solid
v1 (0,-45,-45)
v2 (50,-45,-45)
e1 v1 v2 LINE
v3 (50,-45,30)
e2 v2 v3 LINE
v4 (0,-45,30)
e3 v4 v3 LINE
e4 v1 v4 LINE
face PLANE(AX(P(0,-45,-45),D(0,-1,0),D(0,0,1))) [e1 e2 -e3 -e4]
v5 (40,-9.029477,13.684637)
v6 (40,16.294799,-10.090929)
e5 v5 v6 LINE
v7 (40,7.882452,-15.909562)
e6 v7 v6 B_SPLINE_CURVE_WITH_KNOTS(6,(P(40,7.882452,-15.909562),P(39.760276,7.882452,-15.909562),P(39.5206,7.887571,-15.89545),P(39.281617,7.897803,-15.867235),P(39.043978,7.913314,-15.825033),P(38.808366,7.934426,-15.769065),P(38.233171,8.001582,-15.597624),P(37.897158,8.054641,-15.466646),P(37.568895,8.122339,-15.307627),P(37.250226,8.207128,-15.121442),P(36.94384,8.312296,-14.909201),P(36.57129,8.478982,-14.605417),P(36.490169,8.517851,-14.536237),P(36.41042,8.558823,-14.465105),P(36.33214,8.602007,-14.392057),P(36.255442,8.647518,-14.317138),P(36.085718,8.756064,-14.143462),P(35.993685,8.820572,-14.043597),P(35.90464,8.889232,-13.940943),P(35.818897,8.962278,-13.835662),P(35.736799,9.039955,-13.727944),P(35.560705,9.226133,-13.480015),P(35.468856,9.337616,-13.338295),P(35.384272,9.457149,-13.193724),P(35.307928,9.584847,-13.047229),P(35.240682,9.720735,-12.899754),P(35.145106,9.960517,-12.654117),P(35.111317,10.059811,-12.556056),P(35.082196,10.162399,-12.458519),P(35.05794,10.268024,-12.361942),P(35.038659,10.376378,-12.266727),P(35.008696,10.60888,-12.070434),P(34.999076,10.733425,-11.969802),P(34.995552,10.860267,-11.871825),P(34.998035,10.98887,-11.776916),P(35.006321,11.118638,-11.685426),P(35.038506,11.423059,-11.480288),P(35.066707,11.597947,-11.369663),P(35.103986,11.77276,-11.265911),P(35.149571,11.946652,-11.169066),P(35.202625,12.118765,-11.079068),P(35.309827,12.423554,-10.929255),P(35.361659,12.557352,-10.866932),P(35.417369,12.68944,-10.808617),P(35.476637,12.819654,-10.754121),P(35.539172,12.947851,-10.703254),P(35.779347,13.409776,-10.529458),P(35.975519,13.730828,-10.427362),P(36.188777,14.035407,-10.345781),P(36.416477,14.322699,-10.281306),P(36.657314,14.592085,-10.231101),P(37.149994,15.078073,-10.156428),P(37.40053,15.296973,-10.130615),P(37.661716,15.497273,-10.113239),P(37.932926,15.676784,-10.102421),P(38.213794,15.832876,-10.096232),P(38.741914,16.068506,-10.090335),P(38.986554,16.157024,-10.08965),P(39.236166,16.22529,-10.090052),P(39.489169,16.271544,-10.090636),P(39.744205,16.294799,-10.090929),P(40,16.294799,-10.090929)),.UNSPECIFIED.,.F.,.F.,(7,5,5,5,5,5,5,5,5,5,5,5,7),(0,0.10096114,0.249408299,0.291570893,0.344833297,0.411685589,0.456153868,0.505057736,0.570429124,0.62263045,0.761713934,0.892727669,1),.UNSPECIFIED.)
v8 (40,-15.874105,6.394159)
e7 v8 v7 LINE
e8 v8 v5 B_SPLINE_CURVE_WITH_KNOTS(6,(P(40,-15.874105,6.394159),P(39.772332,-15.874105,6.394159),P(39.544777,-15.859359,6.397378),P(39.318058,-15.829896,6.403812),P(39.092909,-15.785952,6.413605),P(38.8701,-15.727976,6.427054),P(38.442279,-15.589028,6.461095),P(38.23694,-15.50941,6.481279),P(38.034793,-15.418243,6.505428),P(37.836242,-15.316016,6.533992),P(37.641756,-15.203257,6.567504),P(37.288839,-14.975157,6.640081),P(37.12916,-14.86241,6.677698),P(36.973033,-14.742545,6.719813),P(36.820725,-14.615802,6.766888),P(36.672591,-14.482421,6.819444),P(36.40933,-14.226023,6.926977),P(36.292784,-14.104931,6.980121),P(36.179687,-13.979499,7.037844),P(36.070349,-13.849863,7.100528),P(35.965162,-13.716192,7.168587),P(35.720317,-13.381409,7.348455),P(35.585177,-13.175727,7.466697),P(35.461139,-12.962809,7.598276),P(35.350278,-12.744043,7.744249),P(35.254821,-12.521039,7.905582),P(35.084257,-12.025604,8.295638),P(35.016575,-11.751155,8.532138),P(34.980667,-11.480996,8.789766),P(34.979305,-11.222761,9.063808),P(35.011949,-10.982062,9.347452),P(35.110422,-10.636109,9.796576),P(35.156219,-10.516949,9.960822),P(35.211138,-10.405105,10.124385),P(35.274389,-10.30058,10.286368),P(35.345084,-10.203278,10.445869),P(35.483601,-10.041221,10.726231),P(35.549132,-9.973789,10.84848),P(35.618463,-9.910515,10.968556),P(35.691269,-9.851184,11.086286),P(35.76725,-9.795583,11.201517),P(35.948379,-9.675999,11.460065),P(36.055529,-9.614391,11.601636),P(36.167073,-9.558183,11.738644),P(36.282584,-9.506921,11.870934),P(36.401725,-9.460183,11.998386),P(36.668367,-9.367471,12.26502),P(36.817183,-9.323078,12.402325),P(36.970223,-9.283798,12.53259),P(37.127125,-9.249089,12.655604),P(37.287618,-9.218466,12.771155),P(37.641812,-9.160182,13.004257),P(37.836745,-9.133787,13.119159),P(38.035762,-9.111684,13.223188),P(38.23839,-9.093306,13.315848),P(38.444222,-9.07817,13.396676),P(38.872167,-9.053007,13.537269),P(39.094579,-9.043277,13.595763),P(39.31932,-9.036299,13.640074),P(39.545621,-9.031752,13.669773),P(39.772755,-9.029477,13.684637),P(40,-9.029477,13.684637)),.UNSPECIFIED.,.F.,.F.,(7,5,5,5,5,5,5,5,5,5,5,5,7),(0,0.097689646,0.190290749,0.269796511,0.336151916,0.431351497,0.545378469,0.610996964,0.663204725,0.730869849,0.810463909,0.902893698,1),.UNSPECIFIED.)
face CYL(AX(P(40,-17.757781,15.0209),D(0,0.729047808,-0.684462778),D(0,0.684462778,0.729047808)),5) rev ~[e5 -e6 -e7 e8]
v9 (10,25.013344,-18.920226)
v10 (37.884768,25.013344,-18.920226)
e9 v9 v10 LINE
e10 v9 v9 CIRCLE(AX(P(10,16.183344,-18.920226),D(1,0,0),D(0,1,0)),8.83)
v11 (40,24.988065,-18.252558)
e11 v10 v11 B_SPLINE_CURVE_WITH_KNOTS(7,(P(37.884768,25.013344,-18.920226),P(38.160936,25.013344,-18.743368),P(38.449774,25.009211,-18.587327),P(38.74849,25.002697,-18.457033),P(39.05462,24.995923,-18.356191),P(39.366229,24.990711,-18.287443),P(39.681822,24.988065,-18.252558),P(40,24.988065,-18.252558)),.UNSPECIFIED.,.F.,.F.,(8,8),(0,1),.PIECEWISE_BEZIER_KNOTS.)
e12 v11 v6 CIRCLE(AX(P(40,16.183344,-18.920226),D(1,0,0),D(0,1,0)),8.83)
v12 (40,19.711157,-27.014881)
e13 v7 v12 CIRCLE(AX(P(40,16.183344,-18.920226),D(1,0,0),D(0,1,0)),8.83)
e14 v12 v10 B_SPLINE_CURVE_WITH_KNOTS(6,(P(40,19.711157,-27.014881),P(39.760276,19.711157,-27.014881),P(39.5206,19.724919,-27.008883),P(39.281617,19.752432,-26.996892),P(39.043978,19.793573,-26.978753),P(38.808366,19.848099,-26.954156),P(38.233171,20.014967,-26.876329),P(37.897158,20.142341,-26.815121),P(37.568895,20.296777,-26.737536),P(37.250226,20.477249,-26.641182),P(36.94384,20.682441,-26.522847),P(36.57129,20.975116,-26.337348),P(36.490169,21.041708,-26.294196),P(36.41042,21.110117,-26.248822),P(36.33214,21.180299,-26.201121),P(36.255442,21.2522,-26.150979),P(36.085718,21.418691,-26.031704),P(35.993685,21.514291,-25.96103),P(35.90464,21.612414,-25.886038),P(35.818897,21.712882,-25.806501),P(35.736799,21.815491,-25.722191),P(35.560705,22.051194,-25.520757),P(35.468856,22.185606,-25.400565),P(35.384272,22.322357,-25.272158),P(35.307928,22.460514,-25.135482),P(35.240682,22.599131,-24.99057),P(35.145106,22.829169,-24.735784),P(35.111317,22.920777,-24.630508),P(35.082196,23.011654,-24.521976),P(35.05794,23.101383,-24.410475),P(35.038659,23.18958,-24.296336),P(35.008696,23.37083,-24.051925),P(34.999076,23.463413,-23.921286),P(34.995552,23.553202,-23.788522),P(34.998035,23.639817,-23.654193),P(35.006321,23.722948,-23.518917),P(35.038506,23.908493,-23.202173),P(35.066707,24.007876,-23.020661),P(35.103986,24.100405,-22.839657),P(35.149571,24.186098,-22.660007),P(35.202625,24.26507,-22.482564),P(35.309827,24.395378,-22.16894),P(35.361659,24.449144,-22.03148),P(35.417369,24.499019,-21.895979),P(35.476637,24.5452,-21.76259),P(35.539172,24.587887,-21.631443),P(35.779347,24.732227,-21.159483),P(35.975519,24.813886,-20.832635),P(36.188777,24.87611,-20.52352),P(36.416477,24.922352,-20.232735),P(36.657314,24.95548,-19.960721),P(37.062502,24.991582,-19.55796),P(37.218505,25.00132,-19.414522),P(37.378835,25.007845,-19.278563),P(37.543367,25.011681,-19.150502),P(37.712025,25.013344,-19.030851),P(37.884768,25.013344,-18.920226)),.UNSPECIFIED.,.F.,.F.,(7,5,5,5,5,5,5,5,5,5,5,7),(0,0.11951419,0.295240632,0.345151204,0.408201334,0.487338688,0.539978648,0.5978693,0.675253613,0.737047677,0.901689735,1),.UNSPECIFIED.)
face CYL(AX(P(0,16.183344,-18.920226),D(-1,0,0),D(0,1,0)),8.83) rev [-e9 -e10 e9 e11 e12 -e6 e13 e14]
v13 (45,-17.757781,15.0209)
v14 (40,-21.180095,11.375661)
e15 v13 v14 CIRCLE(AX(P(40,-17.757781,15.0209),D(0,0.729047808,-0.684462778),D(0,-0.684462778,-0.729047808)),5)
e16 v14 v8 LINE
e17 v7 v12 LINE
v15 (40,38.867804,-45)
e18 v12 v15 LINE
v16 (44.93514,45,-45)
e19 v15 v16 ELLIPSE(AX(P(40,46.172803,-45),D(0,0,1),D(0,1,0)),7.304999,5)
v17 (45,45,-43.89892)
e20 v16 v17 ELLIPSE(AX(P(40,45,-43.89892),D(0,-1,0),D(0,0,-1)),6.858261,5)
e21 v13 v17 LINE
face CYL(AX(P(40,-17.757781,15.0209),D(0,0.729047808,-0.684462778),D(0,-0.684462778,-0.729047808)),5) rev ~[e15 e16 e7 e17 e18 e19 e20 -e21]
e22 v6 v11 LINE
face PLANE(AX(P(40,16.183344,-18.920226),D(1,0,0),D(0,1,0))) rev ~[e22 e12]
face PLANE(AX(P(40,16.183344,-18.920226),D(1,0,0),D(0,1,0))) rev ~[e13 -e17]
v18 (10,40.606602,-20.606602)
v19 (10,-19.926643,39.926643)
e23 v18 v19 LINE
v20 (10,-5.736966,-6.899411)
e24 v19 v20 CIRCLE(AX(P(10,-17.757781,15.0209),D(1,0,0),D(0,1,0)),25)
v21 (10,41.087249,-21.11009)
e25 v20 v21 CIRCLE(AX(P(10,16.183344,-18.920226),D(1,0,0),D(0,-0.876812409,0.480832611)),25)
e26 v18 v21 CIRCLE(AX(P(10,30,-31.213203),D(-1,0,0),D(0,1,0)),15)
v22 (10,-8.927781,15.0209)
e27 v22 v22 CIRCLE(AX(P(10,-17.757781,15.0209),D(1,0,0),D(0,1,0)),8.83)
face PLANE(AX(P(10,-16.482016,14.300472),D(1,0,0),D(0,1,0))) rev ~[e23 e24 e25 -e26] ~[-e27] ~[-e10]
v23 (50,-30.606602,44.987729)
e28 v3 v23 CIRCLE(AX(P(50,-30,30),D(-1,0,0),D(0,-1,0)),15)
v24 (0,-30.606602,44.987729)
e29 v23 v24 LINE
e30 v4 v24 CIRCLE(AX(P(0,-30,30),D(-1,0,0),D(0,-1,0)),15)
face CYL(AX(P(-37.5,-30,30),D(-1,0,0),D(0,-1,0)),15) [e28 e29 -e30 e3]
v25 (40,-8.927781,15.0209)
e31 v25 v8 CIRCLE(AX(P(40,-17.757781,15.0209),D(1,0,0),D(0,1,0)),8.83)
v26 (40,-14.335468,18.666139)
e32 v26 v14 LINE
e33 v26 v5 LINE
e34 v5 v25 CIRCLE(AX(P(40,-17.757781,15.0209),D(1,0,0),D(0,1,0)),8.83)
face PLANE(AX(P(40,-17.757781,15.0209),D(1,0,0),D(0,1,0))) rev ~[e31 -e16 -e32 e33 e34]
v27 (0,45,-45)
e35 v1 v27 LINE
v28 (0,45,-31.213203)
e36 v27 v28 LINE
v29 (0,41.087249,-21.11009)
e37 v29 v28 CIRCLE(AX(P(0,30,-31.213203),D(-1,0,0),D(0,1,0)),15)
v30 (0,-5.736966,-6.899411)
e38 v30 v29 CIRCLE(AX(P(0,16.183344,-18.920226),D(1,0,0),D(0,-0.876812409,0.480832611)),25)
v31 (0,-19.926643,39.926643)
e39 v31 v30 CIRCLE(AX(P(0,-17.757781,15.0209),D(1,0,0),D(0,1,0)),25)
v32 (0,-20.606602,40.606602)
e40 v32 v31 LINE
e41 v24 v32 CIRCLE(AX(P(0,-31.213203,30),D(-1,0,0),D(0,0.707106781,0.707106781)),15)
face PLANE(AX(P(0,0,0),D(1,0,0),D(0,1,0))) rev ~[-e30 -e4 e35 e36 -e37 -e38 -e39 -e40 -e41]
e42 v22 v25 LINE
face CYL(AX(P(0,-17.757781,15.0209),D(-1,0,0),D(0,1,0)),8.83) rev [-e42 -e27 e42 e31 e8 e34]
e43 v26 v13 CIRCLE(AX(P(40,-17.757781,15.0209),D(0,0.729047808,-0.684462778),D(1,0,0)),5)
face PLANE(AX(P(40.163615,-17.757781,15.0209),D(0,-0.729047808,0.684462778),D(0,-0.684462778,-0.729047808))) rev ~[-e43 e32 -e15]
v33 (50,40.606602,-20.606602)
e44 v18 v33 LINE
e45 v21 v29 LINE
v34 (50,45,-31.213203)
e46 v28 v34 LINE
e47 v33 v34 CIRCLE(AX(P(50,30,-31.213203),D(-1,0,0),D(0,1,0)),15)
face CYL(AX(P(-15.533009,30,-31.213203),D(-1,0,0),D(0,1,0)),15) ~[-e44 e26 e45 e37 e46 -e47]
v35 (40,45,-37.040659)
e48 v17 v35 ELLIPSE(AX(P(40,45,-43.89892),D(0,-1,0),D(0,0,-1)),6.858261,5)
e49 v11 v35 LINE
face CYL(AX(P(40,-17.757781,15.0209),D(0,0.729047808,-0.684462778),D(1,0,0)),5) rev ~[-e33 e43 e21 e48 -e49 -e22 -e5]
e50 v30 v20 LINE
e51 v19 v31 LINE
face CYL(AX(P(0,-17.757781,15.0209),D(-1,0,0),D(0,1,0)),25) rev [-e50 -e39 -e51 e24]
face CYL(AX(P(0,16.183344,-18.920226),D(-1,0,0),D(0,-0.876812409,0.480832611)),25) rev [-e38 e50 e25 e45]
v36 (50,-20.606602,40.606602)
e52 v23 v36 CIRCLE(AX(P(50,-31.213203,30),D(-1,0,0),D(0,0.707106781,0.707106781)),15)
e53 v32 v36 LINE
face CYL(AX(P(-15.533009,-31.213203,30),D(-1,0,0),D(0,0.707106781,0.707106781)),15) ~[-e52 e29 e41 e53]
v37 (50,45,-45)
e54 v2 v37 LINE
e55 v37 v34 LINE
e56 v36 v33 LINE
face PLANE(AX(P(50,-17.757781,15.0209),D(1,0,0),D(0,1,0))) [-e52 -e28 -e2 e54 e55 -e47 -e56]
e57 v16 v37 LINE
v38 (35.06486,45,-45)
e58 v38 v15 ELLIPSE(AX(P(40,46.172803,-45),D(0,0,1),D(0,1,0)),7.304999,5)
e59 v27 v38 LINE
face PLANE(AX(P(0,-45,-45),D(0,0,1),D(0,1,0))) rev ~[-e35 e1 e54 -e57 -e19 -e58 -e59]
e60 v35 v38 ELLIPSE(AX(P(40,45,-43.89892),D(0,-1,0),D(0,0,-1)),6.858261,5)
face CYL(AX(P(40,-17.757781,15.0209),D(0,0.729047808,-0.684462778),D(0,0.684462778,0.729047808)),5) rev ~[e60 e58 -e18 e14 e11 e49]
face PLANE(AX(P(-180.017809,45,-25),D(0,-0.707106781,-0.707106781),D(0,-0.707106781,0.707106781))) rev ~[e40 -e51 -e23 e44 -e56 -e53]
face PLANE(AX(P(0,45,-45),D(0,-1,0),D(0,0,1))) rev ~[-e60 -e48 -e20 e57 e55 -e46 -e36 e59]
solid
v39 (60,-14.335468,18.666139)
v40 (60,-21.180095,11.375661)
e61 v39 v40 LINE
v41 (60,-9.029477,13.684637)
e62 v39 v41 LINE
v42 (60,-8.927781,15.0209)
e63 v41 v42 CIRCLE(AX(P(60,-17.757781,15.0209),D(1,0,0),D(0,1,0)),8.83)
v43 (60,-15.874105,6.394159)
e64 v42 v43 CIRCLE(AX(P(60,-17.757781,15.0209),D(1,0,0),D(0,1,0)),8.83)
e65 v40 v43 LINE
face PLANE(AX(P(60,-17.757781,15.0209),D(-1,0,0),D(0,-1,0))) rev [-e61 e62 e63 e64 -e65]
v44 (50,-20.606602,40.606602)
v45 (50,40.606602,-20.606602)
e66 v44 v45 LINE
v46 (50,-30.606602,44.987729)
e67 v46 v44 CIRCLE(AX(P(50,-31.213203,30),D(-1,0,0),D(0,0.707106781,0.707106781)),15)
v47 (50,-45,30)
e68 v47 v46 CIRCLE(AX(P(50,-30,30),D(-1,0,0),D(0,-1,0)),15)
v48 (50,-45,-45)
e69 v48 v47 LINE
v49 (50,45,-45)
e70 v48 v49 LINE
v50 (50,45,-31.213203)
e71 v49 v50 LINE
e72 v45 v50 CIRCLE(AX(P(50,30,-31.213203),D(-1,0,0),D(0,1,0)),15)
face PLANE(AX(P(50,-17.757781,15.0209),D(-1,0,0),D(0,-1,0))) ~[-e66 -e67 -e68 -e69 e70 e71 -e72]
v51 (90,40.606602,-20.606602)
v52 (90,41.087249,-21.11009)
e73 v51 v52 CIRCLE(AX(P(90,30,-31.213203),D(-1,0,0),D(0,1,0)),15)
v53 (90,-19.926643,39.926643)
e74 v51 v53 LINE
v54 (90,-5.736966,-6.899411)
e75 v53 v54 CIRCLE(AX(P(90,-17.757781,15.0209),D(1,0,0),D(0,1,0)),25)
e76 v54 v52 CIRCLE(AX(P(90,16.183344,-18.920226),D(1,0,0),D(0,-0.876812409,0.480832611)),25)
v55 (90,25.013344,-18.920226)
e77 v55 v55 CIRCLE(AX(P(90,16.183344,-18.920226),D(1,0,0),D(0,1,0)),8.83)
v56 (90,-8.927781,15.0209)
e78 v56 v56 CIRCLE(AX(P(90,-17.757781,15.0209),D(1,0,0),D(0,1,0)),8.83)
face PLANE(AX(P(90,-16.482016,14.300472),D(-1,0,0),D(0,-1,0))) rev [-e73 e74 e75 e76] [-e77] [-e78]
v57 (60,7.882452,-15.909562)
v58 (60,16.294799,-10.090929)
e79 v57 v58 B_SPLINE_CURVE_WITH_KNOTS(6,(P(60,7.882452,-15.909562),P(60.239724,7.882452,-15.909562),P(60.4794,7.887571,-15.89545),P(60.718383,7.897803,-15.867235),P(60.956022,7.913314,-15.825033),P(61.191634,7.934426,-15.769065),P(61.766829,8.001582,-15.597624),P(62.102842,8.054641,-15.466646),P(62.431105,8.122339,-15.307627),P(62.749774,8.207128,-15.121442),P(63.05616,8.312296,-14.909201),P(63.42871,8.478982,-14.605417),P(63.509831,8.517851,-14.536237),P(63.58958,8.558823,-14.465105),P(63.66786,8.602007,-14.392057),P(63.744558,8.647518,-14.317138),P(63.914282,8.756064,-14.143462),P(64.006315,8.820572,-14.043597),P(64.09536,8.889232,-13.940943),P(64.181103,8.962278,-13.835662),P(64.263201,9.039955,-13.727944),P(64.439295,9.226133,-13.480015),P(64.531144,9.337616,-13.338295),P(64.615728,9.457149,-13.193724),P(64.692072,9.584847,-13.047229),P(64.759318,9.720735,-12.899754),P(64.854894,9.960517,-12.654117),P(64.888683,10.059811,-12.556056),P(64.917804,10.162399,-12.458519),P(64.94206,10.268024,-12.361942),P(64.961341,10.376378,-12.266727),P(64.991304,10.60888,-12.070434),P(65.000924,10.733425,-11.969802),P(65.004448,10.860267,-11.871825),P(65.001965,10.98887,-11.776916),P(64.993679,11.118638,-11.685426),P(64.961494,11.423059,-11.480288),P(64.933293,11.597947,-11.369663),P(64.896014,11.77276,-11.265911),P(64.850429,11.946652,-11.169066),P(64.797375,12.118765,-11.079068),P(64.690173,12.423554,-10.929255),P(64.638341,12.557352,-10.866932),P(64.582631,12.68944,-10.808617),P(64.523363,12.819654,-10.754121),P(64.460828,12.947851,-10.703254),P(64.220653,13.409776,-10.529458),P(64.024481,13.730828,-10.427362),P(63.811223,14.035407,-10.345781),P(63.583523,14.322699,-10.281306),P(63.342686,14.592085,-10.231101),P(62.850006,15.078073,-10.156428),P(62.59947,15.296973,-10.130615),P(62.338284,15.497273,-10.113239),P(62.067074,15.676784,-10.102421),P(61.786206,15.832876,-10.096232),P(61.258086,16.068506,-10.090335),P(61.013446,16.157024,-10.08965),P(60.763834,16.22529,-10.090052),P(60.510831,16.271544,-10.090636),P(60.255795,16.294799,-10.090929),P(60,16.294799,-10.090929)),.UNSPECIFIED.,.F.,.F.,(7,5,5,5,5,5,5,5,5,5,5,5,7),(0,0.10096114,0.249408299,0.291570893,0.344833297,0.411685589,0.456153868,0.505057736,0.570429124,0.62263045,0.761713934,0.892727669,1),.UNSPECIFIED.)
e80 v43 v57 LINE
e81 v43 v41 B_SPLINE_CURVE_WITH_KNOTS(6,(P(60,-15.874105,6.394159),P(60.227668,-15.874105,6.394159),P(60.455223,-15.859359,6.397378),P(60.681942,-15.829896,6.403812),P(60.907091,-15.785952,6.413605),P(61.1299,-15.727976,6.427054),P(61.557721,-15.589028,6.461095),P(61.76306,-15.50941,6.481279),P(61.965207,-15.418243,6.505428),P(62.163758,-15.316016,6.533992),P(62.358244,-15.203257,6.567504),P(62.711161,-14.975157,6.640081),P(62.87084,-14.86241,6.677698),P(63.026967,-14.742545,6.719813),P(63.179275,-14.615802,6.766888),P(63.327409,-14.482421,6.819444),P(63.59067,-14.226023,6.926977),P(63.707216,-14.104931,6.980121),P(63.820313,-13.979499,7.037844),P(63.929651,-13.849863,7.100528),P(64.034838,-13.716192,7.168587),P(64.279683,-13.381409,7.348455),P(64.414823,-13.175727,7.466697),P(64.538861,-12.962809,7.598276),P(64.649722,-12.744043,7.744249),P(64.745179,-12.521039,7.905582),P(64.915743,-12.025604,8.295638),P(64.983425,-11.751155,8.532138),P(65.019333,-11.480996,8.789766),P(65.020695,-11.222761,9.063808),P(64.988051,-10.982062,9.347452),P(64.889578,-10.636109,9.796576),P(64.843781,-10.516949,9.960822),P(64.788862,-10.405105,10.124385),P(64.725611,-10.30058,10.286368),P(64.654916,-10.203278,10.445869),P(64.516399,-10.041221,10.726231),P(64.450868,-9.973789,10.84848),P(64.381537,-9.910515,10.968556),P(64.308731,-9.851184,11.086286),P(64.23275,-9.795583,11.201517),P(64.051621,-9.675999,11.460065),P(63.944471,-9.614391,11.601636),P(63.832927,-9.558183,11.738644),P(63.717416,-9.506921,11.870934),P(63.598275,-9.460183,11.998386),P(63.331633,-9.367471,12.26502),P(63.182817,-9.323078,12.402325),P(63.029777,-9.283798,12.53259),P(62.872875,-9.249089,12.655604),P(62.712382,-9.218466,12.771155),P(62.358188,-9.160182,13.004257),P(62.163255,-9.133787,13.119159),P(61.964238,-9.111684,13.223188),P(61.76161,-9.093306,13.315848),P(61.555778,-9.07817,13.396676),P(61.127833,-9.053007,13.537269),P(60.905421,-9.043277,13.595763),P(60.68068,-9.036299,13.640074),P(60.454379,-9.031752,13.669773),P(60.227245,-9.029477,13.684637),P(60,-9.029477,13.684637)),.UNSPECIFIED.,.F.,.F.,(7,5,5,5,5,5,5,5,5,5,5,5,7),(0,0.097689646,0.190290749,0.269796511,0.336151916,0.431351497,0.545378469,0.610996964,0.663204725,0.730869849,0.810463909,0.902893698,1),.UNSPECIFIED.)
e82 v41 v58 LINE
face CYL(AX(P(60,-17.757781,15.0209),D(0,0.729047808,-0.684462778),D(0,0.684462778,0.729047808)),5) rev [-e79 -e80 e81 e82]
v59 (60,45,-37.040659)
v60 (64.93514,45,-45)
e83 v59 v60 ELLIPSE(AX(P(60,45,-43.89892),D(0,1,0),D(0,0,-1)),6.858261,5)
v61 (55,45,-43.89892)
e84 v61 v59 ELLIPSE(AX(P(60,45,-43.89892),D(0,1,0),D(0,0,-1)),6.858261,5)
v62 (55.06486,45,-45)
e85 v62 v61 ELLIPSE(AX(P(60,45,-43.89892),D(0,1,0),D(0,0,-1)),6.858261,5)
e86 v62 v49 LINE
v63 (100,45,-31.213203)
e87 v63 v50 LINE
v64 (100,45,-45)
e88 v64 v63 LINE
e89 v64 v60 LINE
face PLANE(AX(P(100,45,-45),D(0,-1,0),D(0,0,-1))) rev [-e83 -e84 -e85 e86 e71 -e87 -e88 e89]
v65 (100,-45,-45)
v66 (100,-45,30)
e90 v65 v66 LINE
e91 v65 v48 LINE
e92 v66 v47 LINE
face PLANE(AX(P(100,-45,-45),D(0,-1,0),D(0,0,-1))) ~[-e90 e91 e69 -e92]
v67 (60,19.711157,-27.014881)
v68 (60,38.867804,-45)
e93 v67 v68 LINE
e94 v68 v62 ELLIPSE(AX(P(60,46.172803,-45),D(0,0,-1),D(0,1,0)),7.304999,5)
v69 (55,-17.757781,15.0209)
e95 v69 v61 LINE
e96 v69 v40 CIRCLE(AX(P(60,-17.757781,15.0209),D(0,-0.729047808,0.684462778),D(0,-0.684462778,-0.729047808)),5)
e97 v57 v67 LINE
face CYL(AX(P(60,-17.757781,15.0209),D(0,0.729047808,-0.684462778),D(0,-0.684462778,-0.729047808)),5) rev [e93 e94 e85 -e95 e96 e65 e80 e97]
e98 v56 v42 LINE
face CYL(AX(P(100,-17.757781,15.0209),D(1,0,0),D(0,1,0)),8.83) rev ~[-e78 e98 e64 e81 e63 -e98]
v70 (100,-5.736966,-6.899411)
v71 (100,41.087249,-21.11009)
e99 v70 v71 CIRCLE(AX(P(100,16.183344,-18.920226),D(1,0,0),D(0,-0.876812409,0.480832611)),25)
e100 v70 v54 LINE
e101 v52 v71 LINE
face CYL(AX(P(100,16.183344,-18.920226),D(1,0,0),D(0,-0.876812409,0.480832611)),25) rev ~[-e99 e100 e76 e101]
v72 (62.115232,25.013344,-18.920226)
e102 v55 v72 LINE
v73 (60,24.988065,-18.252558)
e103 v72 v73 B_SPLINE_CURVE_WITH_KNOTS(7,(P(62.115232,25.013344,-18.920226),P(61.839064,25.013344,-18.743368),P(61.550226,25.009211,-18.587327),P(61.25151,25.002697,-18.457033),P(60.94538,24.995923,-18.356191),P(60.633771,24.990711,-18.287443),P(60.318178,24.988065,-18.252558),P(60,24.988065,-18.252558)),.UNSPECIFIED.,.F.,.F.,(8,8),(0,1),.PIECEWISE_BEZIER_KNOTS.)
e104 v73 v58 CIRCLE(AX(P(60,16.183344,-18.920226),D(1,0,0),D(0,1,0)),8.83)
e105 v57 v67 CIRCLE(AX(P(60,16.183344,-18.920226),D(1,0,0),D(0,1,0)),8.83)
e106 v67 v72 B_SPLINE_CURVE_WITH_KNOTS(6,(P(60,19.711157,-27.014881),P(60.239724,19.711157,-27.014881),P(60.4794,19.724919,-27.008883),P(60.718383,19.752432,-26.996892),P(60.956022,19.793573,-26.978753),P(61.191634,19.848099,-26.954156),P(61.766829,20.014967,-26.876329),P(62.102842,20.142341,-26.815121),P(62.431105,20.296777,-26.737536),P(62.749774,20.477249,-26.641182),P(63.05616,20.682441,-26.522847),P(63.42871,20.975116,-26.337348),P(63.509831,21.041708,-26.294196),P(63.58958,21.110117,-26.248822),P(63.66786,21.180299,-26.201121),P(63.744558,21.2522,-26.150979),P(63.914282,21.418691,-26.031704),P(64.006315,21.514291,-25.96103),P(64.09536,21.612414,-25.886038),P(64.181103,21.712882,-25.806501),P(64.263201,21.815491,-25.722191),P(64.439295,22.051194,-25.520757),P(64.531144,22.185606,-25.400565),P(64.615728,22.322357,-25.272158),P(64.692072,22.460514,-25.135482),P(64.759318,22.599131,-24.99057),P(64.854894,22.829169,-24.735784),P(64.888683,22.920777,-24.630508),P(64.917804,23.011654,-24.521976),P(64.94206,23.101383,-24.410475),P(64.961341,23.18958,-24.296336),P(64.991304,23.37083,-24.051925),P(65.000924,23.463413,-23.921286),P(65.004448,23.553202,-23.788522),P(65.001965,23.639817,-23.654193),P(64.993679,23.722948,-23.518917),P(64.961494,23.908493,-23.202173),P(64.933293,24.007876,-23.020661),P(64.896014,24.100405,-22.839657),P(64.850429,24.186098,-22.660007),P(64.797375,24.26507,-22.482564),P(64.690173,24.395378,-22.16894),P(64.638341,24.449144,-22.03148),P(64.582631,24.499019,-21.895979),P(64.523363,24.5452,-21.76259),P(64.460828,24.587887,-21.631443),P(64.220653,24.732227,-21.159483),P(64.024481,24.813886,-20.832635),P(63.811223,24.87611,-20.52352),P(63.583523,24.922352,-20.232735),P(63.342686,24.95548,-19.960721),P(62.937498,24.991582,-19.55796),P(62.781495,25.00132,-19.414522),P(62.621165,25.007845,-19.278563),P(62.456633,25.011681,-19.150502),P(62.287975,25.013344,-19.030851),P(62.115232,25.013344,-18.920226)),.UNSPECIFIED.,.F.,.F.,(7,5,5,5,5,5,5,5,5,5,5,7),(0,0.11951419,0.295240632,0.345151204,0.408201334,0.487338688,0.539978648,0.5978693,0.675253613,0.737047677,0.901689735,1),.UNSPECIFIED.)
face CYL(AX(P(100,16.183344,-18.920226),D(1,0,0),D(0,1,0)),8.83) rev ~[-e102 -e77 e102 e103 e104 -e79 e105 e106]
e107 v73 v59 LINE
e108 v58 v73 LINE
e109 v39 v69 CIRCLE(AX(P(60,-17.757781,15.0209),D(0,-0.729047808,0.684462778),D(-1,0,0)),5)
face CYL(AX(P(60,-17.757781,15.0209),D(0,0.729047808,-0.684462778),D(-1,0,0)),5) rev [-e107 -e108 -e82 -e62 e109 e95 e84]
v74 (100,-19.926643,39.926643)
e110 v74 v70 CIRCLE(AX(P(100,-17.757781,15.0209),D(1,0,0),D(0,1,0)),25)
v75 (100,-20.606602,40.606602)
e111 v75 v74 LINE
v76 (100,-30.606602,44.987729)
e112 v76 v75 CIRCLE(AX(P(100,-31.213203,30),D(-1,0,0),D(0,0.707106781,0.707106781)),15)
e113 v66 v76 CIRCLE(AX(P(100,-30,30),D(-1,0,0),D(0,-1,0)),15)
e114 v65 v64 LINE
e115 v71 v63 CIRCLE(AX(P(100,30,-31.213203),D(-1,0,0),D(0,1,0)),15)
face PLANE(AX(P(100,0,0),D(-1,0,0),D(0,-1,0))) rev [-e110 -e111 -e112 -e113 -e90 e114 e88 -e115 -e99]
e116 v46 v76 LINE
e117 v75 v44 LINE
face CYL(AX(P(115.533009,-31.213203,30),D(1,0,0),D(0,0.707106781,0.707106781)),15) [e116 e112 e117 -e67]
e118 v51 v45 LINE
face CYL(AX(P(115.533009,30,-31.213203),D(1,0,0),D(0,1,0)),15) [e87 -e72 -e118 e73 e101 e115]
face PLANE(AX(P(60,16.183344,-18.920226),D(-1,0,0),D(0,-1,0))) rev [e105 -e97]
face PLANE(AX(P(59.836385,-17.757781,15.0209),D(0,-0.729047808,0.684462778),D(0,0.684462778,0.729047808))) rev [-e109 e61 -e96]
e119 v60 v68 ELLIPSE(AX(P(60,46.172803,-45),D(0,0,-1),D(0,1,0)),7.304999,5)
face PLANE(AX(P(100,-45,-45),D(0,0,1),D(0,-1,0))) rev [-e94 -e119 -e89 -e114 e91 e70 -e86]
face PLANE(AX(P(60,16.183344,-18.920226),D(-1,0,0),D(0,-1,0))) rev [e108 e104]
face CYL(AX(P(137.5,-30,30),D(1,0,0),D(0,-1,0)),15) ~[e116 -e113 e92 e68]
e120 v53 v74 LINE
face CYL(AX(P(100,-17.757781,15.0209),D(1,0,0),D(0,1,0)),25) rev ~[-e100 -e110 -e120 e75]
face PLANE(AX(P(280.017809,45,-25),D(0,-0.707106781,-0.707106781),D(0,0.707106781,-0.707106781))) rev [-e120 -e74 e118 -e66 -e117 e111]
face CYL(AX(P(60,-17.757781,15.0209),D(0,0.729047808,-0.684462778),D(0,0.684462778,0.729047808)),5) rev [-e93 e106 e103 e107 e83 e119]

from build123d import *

# Parameters (mm, degrees)
F0_W        = 90
F0_H        = 90
F0_R        = 8.83
F1_DEPTH    = 50
F2_T1_DEPTH = 410.0356183152
F3_T1_DEPTH = 81.066017178
F3_T3_DEPTH = 125
F4_DEPTH    = 10
F6_DEPTH    = 10
F7_R        = 8.83
F8_DEPTH    = 10


# Not quite as in the source:
# - a fillet or chamfer that OpenCascade refuses, or shapes differently, is made with other operations: its cross-section is extruded or revolved along the edge and cut away or added


with BuildPart() as f1:
    # F0 (on Right) → F1 (new body)
    with BuildSketch(Plane.YZ):
        Rectangle(F0_W, F0_H)
        with BuildLine():
            ThreePointArc((-5.7369661858, -6.8994105845), (-39.269643101, 27.758238797), (7.242218534, 15.0208996323))
            ThreePointArc((7.242218534, 15.0208996323), (6.4600606697, 8.8163752919), (4.1625287508, 3.0000843521))
            ThreePointArc((4.1625287508, 3.0000843521), (28.9206831957, 2.5916357703), (41.1833440309, -18.9202258647))
            ThreePointArc((41.1833440309, -18.9202258647), (9.9788196906, -43.1380680004), (-5.7369661858, -6.8994105845))
        make_face(mode=Mode.SUBTRACT)
        with BuildLine():
            ThreePointArc((4.1625287508, 3.0000843521), (-0.0801119364, -2.6567698974), (-5.7369661858, -6.8994105845))
            ThreePointArc((-5.7369661858, -6.8994105845), (9.9788196906, -43.1380680004), (41.1833440309, -18.9202258647))
            ThreePointArc((41.1833440309, -18.9202258647), (28.9206831957, 2.5916357703), (4.1625287508, 3.0000843521))
        make_face()
        with Locations((16.1833440309, -18.9202258647)):
            Circle(F0_R, mode=Mode.SUBTRACT)
        with BuildLine():
            ThreePointArc((4.1625287508, 3.0000843521), (6.4600606697, 8.8163752919), (7.242218534, 15.0208996323))
            ThreePointArc((7.242218534, 15.0208996323), (-39.269643101, 27.758238797), (-5.7369661858, -6.8994105845))
            ThreePointArc((-5.7369661858, -6.8994105845), (-1.4943254987, -1.242556335), (4.1625287508, 3.0000843521))
        make_face()
        with Locations((-17.757781466, 15.0208996323)):
            Circle(F0_R, mode=Mode.SUBTRACT)
        with BuildLine():
            ThreePointArc((4.1625287508, 3.0000843521), (-1.4943254987, -1.242556335), (-5.7369661858, -6.8994105845))
            ThreePointArc((-5.7369661858, -6.8994105845), (-0.0801119364, -2.6567698974), (4.1625287508, 3.0000843521))
        make_face()
    extrude(amount=F1_DEPTH)

    # F2: chamfer of 70 on 1 edges, made by hand

    # F2_s2 → F2_t1 (cut)
    with BuildSketch(Plane.YZ.offset(-180.0178091576)):
        Polygon((45, -25), (-25, 45), (45, 45), align=None)
    extrude(amount=F2_T1_DEPTH, mode=Mode.SUBTRACT)

    # F3: fillet of radius 15 on 3 edges, made by hand

    # F3_s2 → F3_t1 (cut)
    with BuildSketch(Plane.YZ.offset(-15.533008589)):
        with BuildLine():
            ThreePointArc((45, -31.2132034356), (43.8581929877, -25.4729519501), (40.6066017178, -20.6066017178))
            Line((40.6066017178, -20.6066017178), (45, -25))
            Line((45, -25), (45, -31.2132034356))
        make_face()
        with BuildLine():
            ThreePointArc((-20.6066017178, 40.6066017178), (-25.4729519501, 43.8581929877), (-31.2132034356, 45))
            Line((-31.2132034356, 45), (-25, 45))
            Line((-25, 45), (-20.6066017178, 40.6066017178))
        make_face()
    extrude(amount=F3_T1_DEPTH, mode=Mode.SUBTRACT)

    # F3_s4 → F3_t3 (cut)
    with BuildSketch(Plane.YZ.offset(-37.5)):
        with BuildLine():
            ThreePointArc((-45, 30), (-40.6066017178, 40.6066017178), (-30, 45))
            Line((-30, 45), (-45, 45))
            Line((-45, 45), (-45, 30))
        make_face()
    extrude(amount=F3_T3_DEPTH, mode=Mode.SUBTRACT)

    # F0 (on Right) → F4 (cut)
    with BuildSketch(Plane.YZ):
        with BuildLine():
            ThreePointArc((4.1625287508, 3.0000843521), (6.4600606697, 8.8163752919), (7.242218534, 15.0208996323))
            ThreePointArc((7.242218534, 15.0208996323), (-39.269643101, 27.758238797), (-5.7369661858, -6.8994105845))
            ThreePointArc((-5.7369661858, -6.8994105845), (-1.4943254987, -1.242556335), (4.1625287508, 3.0000843521))
        make_face()
        with Locations((-17.757781466, 15.0208996323)):
            Circle(F0_R, mode=Mode.SUBTRACT)
        with BuildLine():
            ThreePointArc((4.1625287508, 3.0000843521), (-0.0801119364, -2.6567698974), (-5.7369661858, -6.8994105845))
            ThreePointArc((-5.7369661858, -6.8994105845), (9.9788196906, -43.1380680004), (41.1833440309, -18.9202258647))
            ThreePointArc((41.1833440309, -18.9202258647), (28.9206831957, 2.5916357703), (4.1625287508, 3.0000843521))
        make_face()
        with Locations((16.1833440309, -18.9202258647)):
            Circle(F0_R, mode=Mode.SUBTRACT)
        with BuildLine():
            ThreePointArc((4.1625287508, 3.0000843521), (-1.4943254987, -1.242556335), (-5.7369661858, -6.8994105845))
            ThreePointArc((-5.7369661858, -6.8994105845), (-0.0801119364, -2.6567698974), (4.1625287508, 3.0000843521))
        make_face()
    extrude(amount=F4_DEPTH, mode=Mode.SUBTRACT)

    # F5 (on face) → F6 (cut, through all)
    with BuildSketch(Plane.YZ):
        with BuildLine():
            ThreePointArc((4.1625287508, 3.0000843521), (8.9331762586, 5.0053894309), (14.014482738, 5.985517262))
            Line((14.014482738, 5.985517262), (7.1479616607, 12.8520383393))
            ThreePointArc((7.1479616607, 12.8520383393), (6.1678338296, 7.7707318599), (4.1625287508, 3.0000843521))
        make_face()
    extrude(amount=F6_DEPTH, mode=Mode.SUBTRACT)

    # F7 (on face) → F8 (join)
    with BuildSketch(Plane.YZ.offset(50)):
        with Locations((-17.757781466, 15.0208996323)):
            Circle(F7_R)
        with Locations((16.1833440309, -18.9202258647)):
            Circle(F7_R)
    extrude(amount=-F8_DEPTH)

    # F12: sweep along a path in F9
    with BuildLine(Plane(origin=(40, 0, 0), x_dir=(0, -1, 0), z_dir=(-1, 0, 0))) as f12_path:
        Line((17.757781466, 15.0208996323), (-52.1658341758, -50.6265266045))
    # F11 (on face) → F12 (sweep, cut)
    with BuildSketch(Plane(origin=(0, -10.4996791259, 9.8575696436), x_dir=(1, 0, 0), z_dir=(0, -0.7290478078, 0.6844627776))):
        with BuildLine():
            ThreePointArc((40, 3.796413521), (35, -1.203586479), (40, -6.203586479))
            Line((40, -6.203586479), (40, 3.796413521))
        make_face()
        with BuildLine():
            Line((40, 3.796413521), (40, -6.203586479))
            ThreePointArc((40, -6.203586479), (43.5355339059, -4.739120385), (45, -1.203586479))
            ThreePointArc((45, -1.203586479), (43.5355339059, 2.3319474269), (40, 3.796413521))
        make_face()
    sweep(path=f12_path.line, mode=Mode.SUBTRACT)


with BuildPart() as f13_1:
    # F13: instance of F1
    add(f1.part.mirror(Plane(origin=(50, -9.1492689096, -9.8684610313), x_dir=(0, 1, 0), z_dir=(1, 0, 0))))


solid = Compound([f1.part, f13_1.part])
